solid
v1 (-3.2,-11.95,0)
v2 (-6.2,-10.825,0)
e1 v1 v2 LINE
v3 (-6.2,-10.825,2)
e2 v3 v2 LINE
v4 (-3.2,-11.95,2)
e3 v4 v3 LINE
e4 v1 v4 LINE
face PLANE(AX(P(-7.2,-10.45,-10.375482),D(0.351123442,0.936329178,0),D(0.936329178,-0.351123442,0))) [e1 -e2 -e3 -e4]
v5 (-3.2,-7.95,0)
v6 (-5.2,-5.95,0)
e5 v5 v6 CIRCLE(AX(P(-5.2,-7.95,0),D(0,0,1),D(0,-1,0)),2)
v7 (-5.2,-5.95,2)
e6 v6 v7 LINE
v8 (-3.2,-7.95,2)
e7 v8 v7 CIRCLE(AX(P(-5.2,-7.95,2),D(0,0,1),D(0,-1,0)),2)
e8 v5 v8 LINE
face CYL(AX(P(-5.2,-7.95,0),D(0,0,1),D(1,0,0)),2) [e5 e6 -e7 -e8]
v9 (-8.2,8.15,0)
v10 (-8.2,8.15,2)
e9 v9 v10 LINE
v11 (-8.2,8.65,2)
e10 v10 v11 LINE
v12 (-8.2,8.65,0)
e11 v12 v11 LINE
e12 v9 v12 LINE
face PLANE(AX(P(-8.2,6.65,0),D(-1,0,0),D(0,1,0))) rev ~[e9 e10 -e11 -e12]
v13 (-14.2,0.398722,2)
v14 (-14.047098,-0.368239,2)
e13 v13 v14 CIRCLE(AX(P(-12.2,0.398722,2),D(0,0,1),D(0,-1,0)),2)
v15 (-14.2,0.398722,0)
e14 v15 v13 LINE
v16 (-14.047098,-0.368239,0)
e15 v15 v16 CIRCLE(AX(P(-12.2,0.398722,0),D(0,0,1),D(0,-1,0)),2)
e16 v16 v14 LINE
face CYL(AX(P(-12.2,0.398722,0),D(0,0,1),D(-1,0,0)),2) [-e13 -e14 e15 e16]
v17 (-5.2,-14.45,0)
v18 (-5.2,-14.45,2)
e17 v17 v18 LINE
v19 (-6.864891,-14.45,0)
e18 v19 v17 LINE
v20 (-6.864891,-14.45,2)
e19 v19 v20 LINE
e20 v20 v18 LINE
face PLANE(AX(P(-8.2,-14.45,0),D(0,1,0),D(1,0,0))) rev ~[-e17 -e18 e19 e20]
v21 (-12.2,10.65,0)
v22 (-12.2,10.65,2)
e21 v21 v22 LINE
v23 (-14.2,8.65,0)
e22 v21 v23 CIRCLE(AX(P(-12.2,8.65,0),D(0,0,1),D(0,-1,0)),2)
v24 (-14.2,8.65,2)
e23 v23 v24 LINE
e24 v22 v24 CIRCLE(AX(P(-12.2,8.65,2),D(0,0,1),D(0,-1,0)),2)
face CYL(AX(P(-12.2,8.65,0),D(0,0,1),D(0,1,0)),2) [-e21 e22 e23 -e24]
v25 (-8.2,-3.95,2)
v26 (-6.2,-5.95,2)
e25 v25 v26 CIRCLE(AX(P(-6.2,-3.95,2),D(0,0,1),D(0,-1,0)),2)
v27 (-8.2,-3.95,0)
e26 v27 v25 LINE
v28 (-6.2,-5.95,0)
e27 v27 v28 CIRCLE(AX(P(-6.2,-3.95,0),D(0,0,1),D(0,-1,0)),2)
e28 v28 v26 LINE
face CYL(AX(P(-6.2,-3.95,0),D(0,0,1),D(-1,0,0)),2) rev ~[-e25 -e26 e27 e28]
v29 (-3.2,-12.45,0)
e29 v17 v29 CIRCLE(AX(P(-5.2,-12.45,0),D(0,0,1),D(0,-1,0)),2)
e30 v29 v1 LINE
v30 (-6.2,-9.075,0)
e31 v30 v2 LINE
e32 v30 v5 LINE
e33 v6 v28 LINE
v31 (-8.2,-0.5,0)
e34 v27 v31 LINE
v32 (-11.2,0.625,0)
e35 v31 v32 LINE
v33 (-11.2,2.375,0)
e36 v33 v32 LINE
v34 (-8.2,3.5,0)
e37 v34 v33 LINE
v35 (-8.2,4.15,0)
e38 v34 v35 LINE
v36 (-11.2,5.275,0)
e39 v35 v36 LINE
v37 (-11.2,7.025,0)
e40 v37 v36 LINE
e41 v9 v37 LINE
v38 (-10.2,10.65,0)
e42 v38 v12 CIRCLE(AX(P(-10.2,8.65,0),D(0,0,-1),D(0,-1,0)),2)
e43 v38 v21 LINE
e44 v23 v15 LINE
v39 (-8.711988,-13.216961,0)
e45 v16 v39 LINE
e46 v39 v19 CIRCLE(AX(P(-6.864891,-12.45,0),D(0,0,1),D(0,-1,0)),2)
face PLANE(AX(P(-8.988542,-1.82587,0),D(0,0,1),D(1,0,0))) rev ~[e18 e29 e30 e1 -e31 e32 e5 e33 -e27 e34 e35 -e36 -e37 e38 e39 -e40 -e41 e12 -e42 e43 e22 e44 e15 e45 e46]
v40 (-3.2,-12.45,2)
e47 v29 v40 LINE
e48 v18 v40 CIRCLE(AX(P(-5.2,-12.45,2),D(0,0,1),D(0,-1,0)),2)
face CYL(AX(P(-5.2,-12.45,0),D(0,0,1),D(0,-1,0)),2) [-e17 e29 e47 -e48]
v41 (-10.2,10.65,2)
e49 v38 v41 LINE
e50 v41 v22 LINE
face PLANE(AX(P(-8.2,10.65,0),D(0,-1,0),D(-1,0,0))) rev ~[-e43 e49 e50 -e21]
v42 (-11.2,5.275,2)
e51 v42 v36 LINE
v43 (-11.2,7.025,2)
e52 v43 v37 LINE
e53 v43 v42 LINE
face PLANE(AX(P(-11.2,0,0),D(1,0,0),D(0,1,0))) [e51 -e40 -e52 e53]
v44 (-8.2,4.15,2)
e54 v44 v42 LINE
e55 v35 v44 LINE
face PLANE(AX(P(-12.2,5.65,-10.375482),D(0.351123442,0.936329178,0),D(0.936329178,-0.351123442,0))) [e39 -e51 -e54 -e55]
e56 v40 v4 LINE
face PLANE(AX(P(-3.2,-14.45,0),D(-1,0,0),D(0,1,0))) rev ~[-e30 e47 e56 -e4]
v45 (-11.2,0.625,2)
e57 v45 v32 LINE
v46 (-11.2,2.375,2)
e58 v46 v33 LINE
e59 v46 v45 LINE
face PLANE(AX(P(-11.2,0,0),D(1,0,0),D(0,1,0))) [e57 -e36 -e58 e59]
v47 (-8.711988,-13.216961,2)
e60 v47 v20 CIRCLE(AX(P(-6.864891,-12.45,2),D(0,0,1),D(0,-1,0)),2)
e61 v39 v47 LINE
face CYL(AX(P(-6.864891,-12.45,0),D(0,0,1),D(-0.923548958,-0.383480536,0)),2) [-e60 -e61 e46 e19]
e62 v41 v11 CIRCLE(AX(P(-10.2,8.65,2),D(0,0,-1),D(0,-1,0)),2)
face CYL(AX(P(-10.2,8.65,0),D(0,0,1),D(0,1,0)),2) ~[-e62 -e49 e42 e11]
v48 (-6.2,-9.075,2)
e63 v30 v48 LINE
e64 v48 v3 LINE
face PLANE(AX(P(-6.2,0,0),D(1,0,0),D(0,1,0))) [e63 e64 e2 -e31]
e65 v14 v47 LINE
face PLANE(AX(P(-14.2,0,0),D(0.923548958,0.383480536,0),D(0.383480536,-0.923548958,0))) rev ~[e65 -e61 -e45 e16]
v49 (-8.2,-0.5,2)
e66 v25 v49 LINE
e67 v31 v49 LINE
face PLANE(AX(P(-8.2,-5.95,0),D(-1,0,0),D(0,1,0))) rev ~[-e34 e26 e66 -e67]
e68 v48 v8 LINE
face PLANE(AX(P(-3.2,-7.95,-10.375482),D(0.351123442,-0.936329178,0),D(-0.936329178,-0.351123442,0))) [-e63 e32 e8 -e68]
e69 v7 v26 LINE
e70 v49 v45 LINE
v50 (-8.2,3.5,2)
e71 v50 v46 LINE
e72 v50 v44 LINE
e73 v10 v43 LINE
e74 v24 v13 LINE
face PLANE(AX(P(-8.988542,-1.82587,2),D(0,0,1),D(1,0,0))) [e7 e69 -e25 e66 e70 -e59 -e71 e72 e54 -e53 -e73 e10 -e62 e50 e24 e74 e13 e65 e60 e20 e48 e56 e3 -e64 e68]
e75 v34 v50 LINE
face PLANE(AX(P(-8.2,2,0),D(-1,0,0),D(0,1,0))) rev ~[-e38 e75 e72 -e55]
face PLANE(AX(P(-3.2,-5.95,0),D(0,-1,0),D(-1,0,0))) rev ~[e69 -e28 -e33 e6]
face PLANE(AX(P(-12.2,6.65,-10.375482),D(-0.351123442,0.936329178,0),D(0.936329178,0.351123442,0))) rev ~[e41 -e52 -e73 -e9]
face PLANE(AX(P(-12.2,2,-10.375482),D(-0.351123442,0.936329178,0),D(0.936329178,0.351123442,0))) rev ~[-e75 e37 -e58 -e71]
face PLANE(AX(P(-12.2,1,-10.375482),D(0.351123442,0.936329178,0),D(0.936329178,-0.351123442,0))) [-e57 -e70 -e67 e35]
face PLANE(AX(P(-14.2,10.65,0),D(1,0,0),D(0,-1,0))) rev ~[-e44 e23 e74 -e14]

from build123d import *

# Parameters (mm, degrees)
F1_DEPTH     = 2
F2_R         = 2
F3_R         = 2
F4_T4_DEPTH  = 22.7509646446
F4_T9_DEPTH  = 22.7509646446
F4_T14_DEPTH = 22.7509646446
F5_T4_DEPTH  = 22.7509646446
F5_T9_DEPTH  = 22.7509646446
F6_T4_DEPTH  = 22.7509646446


# Not quite as in the source:
# - a fillet or chamfer that OpenCascade refuses, or shapes differently, is made with other operations: its cross-section is extruded or revolved along the edge and cut away or added


with BuildPart() as f1:
    # F0 (on Top) → F1 (new body)
    with BuildSketch(Plane.XY):
        Polygon((-8.2, 10.65), (-14.2, 10.65), (-14.2, 0), (-8.2, -14.45), (-3.2, -14.45), (-3.2, -10.45), (-6.2, -10.45), (-6.2, -9.45), (-3.2, -9.45), (-3.2, -5.95), (-8.2, -5.95), (-8.2, 1), (-11.2, 1), (-11.2, 2), (-8.2, 2), (-8.2, 5.65), (-11.2, 5.65), (-11.2, 6.65), (-8.2, 6.65), align=None)
    extrude(amount=F1_DEPTH)

    # F2
    f2_edges = [f1.edges().sort_by_distance(p)[0] for p in [
        (-14.2, 10.65, 1),
        (-14.2, 0, 1),
        (-8.2, 10.65, 1),
        (-8.2, -14.45, 1),
        (-3.2, -14.45, 1),
        (-3.2, -5.95, 1),
    ]]
    fillet(f2_edges, radius=F2_R)

    # F3
    f3_edges = [f1.edges().sort_by_distance(p)[0] for p in [
        (-8.2, -5.95, 1),
    ]]
    fillet(f3_edges, radius=F3_R)

    # F4: chamfer of 1.5 x 4 on 3 edges, made by hand


with BuildPart() as f4_tool2:
    # F4_s3 → F4_t4 (new body)
    with BuildSketch(Plane.XY.offset(-10.3754823223)):
        Polygon((-12.2, 6.65), (-8.2, 8.15), (-8.2, 6.65), align=None)
    extrude(amount=F4_T4_DEPTH)

    split(bisect_by=Plane.YZ.offset(-11.2), keep=Keep.TOP)


with BuildPart() as f1_1:
    add(f1.part)

    # F4_t1: cut F4_tool2
    add(f4_tool2.part, mode=Mode.SUBTRACT)


with BuildPart() as f4_tool7:
    # F4_s8 → F4_t9 (new body)
    with BuildSketch(Plane.XY.offset(-10.3754823223)):
        Polygon((-12.2, 2), (-8.2, 3.5), (-8.2, 2), align=None)
    extrude(amount=F4_T9_DEPTH)

    split(bisect_by=Plane.YZ.offset(-11.2), keep=Keep.TOP)


with BuildPart() as f1_2:
    add(f1_1.part)

    # F4_t6: cut F4_tool7
    add(f4_tool7.part, mode=Mode.SUBTRACT)


with BuildPart() as f4_tool12:
    # F4_s13 → F4_t14 (new body)
    with BuildSketch(Plane.XY.offset(-10.3754823223)):
        Polygon((-3.2, -7.95), (-7.2, -9.45), (-3.2, -9.45), align=None)
    extrude(amount=F4_T14_DEPTH)

    split(bisect_by=Plane.YZ.offset(-6.2), keep=Keep.TOP)


with BuildPart() as f1_3:
    add(f1_2.part)

    # F4_t11: cut F4_tool12
    add(f4_tool12.part, mode=Mode.SUBTRACT)

    # F5: chamfer of 4 x 1.5 on 2 edges, made by hand


with BuildPart() as f5_tool2:
    # F5_s3 → F5_t4 (new body)
    with BuildSketch(Plane.XY.offset(-10.3754823223)):
        Polygon((-12.2, 5.65), (-8.2, 4.15), (-8.2, 5.65), align=None)
    extrude(amount=F5_T4_DEPTH)

    split(bisect_by=Plane.YZ.offset(-11.2), keep=Keep.TOP)


with BuildPart() as f1_4:
    add(f1_3.part)

    # F5_t1: cut F5_tool2
    add(f5_tool2.part, mode=Mode.SUBTRACT)


with BuildPart() as f5_tool7:
    # F5_s8 → F5_t9 (new body)
    with BuildSketch(Plane.XY.offset(-10.3754823223)):
        Polygon((-7.2, -10.45), (-3.2, -11.95), (-3.2, -10.45), align=None)
    extrude(amount=F5_T9_DEPTH)

    split(bisect_by=Plane.YZ.offset(-6.2), keep=Keep.TOP)


with BuildPart() as f1_5:
    add(f1_4.part)

    # F5_t6: cut F5_tool7
    add(f5_tool7.part, mode=Mode.SUBTRACT)

    # F6: chamfer of 4 x 1.5 on 1 edges, made by hand


with BuildPart() as f6_tool2:
    # F6_s3 → F6_t4 (new body)
    with BuildSketch(Plane.XY.offset(-10.3754823223)):
        Polygon((-12.2, 1), (-8.2, -0.5), (-8.2, 1), align=None)
    extrude(amount=F6_T4_DEPTH)

    split(bisect_by=Plane.YZ.offset(-11.2), keep=Keep.TOP)


with BuildPart() as f1_6:
    add(f1_5.part)

    # F6_t1: cut F6_tool2
    add(f6_tool2.part, mode=Mode.SUBTRACT)


solid = f1_6.part
